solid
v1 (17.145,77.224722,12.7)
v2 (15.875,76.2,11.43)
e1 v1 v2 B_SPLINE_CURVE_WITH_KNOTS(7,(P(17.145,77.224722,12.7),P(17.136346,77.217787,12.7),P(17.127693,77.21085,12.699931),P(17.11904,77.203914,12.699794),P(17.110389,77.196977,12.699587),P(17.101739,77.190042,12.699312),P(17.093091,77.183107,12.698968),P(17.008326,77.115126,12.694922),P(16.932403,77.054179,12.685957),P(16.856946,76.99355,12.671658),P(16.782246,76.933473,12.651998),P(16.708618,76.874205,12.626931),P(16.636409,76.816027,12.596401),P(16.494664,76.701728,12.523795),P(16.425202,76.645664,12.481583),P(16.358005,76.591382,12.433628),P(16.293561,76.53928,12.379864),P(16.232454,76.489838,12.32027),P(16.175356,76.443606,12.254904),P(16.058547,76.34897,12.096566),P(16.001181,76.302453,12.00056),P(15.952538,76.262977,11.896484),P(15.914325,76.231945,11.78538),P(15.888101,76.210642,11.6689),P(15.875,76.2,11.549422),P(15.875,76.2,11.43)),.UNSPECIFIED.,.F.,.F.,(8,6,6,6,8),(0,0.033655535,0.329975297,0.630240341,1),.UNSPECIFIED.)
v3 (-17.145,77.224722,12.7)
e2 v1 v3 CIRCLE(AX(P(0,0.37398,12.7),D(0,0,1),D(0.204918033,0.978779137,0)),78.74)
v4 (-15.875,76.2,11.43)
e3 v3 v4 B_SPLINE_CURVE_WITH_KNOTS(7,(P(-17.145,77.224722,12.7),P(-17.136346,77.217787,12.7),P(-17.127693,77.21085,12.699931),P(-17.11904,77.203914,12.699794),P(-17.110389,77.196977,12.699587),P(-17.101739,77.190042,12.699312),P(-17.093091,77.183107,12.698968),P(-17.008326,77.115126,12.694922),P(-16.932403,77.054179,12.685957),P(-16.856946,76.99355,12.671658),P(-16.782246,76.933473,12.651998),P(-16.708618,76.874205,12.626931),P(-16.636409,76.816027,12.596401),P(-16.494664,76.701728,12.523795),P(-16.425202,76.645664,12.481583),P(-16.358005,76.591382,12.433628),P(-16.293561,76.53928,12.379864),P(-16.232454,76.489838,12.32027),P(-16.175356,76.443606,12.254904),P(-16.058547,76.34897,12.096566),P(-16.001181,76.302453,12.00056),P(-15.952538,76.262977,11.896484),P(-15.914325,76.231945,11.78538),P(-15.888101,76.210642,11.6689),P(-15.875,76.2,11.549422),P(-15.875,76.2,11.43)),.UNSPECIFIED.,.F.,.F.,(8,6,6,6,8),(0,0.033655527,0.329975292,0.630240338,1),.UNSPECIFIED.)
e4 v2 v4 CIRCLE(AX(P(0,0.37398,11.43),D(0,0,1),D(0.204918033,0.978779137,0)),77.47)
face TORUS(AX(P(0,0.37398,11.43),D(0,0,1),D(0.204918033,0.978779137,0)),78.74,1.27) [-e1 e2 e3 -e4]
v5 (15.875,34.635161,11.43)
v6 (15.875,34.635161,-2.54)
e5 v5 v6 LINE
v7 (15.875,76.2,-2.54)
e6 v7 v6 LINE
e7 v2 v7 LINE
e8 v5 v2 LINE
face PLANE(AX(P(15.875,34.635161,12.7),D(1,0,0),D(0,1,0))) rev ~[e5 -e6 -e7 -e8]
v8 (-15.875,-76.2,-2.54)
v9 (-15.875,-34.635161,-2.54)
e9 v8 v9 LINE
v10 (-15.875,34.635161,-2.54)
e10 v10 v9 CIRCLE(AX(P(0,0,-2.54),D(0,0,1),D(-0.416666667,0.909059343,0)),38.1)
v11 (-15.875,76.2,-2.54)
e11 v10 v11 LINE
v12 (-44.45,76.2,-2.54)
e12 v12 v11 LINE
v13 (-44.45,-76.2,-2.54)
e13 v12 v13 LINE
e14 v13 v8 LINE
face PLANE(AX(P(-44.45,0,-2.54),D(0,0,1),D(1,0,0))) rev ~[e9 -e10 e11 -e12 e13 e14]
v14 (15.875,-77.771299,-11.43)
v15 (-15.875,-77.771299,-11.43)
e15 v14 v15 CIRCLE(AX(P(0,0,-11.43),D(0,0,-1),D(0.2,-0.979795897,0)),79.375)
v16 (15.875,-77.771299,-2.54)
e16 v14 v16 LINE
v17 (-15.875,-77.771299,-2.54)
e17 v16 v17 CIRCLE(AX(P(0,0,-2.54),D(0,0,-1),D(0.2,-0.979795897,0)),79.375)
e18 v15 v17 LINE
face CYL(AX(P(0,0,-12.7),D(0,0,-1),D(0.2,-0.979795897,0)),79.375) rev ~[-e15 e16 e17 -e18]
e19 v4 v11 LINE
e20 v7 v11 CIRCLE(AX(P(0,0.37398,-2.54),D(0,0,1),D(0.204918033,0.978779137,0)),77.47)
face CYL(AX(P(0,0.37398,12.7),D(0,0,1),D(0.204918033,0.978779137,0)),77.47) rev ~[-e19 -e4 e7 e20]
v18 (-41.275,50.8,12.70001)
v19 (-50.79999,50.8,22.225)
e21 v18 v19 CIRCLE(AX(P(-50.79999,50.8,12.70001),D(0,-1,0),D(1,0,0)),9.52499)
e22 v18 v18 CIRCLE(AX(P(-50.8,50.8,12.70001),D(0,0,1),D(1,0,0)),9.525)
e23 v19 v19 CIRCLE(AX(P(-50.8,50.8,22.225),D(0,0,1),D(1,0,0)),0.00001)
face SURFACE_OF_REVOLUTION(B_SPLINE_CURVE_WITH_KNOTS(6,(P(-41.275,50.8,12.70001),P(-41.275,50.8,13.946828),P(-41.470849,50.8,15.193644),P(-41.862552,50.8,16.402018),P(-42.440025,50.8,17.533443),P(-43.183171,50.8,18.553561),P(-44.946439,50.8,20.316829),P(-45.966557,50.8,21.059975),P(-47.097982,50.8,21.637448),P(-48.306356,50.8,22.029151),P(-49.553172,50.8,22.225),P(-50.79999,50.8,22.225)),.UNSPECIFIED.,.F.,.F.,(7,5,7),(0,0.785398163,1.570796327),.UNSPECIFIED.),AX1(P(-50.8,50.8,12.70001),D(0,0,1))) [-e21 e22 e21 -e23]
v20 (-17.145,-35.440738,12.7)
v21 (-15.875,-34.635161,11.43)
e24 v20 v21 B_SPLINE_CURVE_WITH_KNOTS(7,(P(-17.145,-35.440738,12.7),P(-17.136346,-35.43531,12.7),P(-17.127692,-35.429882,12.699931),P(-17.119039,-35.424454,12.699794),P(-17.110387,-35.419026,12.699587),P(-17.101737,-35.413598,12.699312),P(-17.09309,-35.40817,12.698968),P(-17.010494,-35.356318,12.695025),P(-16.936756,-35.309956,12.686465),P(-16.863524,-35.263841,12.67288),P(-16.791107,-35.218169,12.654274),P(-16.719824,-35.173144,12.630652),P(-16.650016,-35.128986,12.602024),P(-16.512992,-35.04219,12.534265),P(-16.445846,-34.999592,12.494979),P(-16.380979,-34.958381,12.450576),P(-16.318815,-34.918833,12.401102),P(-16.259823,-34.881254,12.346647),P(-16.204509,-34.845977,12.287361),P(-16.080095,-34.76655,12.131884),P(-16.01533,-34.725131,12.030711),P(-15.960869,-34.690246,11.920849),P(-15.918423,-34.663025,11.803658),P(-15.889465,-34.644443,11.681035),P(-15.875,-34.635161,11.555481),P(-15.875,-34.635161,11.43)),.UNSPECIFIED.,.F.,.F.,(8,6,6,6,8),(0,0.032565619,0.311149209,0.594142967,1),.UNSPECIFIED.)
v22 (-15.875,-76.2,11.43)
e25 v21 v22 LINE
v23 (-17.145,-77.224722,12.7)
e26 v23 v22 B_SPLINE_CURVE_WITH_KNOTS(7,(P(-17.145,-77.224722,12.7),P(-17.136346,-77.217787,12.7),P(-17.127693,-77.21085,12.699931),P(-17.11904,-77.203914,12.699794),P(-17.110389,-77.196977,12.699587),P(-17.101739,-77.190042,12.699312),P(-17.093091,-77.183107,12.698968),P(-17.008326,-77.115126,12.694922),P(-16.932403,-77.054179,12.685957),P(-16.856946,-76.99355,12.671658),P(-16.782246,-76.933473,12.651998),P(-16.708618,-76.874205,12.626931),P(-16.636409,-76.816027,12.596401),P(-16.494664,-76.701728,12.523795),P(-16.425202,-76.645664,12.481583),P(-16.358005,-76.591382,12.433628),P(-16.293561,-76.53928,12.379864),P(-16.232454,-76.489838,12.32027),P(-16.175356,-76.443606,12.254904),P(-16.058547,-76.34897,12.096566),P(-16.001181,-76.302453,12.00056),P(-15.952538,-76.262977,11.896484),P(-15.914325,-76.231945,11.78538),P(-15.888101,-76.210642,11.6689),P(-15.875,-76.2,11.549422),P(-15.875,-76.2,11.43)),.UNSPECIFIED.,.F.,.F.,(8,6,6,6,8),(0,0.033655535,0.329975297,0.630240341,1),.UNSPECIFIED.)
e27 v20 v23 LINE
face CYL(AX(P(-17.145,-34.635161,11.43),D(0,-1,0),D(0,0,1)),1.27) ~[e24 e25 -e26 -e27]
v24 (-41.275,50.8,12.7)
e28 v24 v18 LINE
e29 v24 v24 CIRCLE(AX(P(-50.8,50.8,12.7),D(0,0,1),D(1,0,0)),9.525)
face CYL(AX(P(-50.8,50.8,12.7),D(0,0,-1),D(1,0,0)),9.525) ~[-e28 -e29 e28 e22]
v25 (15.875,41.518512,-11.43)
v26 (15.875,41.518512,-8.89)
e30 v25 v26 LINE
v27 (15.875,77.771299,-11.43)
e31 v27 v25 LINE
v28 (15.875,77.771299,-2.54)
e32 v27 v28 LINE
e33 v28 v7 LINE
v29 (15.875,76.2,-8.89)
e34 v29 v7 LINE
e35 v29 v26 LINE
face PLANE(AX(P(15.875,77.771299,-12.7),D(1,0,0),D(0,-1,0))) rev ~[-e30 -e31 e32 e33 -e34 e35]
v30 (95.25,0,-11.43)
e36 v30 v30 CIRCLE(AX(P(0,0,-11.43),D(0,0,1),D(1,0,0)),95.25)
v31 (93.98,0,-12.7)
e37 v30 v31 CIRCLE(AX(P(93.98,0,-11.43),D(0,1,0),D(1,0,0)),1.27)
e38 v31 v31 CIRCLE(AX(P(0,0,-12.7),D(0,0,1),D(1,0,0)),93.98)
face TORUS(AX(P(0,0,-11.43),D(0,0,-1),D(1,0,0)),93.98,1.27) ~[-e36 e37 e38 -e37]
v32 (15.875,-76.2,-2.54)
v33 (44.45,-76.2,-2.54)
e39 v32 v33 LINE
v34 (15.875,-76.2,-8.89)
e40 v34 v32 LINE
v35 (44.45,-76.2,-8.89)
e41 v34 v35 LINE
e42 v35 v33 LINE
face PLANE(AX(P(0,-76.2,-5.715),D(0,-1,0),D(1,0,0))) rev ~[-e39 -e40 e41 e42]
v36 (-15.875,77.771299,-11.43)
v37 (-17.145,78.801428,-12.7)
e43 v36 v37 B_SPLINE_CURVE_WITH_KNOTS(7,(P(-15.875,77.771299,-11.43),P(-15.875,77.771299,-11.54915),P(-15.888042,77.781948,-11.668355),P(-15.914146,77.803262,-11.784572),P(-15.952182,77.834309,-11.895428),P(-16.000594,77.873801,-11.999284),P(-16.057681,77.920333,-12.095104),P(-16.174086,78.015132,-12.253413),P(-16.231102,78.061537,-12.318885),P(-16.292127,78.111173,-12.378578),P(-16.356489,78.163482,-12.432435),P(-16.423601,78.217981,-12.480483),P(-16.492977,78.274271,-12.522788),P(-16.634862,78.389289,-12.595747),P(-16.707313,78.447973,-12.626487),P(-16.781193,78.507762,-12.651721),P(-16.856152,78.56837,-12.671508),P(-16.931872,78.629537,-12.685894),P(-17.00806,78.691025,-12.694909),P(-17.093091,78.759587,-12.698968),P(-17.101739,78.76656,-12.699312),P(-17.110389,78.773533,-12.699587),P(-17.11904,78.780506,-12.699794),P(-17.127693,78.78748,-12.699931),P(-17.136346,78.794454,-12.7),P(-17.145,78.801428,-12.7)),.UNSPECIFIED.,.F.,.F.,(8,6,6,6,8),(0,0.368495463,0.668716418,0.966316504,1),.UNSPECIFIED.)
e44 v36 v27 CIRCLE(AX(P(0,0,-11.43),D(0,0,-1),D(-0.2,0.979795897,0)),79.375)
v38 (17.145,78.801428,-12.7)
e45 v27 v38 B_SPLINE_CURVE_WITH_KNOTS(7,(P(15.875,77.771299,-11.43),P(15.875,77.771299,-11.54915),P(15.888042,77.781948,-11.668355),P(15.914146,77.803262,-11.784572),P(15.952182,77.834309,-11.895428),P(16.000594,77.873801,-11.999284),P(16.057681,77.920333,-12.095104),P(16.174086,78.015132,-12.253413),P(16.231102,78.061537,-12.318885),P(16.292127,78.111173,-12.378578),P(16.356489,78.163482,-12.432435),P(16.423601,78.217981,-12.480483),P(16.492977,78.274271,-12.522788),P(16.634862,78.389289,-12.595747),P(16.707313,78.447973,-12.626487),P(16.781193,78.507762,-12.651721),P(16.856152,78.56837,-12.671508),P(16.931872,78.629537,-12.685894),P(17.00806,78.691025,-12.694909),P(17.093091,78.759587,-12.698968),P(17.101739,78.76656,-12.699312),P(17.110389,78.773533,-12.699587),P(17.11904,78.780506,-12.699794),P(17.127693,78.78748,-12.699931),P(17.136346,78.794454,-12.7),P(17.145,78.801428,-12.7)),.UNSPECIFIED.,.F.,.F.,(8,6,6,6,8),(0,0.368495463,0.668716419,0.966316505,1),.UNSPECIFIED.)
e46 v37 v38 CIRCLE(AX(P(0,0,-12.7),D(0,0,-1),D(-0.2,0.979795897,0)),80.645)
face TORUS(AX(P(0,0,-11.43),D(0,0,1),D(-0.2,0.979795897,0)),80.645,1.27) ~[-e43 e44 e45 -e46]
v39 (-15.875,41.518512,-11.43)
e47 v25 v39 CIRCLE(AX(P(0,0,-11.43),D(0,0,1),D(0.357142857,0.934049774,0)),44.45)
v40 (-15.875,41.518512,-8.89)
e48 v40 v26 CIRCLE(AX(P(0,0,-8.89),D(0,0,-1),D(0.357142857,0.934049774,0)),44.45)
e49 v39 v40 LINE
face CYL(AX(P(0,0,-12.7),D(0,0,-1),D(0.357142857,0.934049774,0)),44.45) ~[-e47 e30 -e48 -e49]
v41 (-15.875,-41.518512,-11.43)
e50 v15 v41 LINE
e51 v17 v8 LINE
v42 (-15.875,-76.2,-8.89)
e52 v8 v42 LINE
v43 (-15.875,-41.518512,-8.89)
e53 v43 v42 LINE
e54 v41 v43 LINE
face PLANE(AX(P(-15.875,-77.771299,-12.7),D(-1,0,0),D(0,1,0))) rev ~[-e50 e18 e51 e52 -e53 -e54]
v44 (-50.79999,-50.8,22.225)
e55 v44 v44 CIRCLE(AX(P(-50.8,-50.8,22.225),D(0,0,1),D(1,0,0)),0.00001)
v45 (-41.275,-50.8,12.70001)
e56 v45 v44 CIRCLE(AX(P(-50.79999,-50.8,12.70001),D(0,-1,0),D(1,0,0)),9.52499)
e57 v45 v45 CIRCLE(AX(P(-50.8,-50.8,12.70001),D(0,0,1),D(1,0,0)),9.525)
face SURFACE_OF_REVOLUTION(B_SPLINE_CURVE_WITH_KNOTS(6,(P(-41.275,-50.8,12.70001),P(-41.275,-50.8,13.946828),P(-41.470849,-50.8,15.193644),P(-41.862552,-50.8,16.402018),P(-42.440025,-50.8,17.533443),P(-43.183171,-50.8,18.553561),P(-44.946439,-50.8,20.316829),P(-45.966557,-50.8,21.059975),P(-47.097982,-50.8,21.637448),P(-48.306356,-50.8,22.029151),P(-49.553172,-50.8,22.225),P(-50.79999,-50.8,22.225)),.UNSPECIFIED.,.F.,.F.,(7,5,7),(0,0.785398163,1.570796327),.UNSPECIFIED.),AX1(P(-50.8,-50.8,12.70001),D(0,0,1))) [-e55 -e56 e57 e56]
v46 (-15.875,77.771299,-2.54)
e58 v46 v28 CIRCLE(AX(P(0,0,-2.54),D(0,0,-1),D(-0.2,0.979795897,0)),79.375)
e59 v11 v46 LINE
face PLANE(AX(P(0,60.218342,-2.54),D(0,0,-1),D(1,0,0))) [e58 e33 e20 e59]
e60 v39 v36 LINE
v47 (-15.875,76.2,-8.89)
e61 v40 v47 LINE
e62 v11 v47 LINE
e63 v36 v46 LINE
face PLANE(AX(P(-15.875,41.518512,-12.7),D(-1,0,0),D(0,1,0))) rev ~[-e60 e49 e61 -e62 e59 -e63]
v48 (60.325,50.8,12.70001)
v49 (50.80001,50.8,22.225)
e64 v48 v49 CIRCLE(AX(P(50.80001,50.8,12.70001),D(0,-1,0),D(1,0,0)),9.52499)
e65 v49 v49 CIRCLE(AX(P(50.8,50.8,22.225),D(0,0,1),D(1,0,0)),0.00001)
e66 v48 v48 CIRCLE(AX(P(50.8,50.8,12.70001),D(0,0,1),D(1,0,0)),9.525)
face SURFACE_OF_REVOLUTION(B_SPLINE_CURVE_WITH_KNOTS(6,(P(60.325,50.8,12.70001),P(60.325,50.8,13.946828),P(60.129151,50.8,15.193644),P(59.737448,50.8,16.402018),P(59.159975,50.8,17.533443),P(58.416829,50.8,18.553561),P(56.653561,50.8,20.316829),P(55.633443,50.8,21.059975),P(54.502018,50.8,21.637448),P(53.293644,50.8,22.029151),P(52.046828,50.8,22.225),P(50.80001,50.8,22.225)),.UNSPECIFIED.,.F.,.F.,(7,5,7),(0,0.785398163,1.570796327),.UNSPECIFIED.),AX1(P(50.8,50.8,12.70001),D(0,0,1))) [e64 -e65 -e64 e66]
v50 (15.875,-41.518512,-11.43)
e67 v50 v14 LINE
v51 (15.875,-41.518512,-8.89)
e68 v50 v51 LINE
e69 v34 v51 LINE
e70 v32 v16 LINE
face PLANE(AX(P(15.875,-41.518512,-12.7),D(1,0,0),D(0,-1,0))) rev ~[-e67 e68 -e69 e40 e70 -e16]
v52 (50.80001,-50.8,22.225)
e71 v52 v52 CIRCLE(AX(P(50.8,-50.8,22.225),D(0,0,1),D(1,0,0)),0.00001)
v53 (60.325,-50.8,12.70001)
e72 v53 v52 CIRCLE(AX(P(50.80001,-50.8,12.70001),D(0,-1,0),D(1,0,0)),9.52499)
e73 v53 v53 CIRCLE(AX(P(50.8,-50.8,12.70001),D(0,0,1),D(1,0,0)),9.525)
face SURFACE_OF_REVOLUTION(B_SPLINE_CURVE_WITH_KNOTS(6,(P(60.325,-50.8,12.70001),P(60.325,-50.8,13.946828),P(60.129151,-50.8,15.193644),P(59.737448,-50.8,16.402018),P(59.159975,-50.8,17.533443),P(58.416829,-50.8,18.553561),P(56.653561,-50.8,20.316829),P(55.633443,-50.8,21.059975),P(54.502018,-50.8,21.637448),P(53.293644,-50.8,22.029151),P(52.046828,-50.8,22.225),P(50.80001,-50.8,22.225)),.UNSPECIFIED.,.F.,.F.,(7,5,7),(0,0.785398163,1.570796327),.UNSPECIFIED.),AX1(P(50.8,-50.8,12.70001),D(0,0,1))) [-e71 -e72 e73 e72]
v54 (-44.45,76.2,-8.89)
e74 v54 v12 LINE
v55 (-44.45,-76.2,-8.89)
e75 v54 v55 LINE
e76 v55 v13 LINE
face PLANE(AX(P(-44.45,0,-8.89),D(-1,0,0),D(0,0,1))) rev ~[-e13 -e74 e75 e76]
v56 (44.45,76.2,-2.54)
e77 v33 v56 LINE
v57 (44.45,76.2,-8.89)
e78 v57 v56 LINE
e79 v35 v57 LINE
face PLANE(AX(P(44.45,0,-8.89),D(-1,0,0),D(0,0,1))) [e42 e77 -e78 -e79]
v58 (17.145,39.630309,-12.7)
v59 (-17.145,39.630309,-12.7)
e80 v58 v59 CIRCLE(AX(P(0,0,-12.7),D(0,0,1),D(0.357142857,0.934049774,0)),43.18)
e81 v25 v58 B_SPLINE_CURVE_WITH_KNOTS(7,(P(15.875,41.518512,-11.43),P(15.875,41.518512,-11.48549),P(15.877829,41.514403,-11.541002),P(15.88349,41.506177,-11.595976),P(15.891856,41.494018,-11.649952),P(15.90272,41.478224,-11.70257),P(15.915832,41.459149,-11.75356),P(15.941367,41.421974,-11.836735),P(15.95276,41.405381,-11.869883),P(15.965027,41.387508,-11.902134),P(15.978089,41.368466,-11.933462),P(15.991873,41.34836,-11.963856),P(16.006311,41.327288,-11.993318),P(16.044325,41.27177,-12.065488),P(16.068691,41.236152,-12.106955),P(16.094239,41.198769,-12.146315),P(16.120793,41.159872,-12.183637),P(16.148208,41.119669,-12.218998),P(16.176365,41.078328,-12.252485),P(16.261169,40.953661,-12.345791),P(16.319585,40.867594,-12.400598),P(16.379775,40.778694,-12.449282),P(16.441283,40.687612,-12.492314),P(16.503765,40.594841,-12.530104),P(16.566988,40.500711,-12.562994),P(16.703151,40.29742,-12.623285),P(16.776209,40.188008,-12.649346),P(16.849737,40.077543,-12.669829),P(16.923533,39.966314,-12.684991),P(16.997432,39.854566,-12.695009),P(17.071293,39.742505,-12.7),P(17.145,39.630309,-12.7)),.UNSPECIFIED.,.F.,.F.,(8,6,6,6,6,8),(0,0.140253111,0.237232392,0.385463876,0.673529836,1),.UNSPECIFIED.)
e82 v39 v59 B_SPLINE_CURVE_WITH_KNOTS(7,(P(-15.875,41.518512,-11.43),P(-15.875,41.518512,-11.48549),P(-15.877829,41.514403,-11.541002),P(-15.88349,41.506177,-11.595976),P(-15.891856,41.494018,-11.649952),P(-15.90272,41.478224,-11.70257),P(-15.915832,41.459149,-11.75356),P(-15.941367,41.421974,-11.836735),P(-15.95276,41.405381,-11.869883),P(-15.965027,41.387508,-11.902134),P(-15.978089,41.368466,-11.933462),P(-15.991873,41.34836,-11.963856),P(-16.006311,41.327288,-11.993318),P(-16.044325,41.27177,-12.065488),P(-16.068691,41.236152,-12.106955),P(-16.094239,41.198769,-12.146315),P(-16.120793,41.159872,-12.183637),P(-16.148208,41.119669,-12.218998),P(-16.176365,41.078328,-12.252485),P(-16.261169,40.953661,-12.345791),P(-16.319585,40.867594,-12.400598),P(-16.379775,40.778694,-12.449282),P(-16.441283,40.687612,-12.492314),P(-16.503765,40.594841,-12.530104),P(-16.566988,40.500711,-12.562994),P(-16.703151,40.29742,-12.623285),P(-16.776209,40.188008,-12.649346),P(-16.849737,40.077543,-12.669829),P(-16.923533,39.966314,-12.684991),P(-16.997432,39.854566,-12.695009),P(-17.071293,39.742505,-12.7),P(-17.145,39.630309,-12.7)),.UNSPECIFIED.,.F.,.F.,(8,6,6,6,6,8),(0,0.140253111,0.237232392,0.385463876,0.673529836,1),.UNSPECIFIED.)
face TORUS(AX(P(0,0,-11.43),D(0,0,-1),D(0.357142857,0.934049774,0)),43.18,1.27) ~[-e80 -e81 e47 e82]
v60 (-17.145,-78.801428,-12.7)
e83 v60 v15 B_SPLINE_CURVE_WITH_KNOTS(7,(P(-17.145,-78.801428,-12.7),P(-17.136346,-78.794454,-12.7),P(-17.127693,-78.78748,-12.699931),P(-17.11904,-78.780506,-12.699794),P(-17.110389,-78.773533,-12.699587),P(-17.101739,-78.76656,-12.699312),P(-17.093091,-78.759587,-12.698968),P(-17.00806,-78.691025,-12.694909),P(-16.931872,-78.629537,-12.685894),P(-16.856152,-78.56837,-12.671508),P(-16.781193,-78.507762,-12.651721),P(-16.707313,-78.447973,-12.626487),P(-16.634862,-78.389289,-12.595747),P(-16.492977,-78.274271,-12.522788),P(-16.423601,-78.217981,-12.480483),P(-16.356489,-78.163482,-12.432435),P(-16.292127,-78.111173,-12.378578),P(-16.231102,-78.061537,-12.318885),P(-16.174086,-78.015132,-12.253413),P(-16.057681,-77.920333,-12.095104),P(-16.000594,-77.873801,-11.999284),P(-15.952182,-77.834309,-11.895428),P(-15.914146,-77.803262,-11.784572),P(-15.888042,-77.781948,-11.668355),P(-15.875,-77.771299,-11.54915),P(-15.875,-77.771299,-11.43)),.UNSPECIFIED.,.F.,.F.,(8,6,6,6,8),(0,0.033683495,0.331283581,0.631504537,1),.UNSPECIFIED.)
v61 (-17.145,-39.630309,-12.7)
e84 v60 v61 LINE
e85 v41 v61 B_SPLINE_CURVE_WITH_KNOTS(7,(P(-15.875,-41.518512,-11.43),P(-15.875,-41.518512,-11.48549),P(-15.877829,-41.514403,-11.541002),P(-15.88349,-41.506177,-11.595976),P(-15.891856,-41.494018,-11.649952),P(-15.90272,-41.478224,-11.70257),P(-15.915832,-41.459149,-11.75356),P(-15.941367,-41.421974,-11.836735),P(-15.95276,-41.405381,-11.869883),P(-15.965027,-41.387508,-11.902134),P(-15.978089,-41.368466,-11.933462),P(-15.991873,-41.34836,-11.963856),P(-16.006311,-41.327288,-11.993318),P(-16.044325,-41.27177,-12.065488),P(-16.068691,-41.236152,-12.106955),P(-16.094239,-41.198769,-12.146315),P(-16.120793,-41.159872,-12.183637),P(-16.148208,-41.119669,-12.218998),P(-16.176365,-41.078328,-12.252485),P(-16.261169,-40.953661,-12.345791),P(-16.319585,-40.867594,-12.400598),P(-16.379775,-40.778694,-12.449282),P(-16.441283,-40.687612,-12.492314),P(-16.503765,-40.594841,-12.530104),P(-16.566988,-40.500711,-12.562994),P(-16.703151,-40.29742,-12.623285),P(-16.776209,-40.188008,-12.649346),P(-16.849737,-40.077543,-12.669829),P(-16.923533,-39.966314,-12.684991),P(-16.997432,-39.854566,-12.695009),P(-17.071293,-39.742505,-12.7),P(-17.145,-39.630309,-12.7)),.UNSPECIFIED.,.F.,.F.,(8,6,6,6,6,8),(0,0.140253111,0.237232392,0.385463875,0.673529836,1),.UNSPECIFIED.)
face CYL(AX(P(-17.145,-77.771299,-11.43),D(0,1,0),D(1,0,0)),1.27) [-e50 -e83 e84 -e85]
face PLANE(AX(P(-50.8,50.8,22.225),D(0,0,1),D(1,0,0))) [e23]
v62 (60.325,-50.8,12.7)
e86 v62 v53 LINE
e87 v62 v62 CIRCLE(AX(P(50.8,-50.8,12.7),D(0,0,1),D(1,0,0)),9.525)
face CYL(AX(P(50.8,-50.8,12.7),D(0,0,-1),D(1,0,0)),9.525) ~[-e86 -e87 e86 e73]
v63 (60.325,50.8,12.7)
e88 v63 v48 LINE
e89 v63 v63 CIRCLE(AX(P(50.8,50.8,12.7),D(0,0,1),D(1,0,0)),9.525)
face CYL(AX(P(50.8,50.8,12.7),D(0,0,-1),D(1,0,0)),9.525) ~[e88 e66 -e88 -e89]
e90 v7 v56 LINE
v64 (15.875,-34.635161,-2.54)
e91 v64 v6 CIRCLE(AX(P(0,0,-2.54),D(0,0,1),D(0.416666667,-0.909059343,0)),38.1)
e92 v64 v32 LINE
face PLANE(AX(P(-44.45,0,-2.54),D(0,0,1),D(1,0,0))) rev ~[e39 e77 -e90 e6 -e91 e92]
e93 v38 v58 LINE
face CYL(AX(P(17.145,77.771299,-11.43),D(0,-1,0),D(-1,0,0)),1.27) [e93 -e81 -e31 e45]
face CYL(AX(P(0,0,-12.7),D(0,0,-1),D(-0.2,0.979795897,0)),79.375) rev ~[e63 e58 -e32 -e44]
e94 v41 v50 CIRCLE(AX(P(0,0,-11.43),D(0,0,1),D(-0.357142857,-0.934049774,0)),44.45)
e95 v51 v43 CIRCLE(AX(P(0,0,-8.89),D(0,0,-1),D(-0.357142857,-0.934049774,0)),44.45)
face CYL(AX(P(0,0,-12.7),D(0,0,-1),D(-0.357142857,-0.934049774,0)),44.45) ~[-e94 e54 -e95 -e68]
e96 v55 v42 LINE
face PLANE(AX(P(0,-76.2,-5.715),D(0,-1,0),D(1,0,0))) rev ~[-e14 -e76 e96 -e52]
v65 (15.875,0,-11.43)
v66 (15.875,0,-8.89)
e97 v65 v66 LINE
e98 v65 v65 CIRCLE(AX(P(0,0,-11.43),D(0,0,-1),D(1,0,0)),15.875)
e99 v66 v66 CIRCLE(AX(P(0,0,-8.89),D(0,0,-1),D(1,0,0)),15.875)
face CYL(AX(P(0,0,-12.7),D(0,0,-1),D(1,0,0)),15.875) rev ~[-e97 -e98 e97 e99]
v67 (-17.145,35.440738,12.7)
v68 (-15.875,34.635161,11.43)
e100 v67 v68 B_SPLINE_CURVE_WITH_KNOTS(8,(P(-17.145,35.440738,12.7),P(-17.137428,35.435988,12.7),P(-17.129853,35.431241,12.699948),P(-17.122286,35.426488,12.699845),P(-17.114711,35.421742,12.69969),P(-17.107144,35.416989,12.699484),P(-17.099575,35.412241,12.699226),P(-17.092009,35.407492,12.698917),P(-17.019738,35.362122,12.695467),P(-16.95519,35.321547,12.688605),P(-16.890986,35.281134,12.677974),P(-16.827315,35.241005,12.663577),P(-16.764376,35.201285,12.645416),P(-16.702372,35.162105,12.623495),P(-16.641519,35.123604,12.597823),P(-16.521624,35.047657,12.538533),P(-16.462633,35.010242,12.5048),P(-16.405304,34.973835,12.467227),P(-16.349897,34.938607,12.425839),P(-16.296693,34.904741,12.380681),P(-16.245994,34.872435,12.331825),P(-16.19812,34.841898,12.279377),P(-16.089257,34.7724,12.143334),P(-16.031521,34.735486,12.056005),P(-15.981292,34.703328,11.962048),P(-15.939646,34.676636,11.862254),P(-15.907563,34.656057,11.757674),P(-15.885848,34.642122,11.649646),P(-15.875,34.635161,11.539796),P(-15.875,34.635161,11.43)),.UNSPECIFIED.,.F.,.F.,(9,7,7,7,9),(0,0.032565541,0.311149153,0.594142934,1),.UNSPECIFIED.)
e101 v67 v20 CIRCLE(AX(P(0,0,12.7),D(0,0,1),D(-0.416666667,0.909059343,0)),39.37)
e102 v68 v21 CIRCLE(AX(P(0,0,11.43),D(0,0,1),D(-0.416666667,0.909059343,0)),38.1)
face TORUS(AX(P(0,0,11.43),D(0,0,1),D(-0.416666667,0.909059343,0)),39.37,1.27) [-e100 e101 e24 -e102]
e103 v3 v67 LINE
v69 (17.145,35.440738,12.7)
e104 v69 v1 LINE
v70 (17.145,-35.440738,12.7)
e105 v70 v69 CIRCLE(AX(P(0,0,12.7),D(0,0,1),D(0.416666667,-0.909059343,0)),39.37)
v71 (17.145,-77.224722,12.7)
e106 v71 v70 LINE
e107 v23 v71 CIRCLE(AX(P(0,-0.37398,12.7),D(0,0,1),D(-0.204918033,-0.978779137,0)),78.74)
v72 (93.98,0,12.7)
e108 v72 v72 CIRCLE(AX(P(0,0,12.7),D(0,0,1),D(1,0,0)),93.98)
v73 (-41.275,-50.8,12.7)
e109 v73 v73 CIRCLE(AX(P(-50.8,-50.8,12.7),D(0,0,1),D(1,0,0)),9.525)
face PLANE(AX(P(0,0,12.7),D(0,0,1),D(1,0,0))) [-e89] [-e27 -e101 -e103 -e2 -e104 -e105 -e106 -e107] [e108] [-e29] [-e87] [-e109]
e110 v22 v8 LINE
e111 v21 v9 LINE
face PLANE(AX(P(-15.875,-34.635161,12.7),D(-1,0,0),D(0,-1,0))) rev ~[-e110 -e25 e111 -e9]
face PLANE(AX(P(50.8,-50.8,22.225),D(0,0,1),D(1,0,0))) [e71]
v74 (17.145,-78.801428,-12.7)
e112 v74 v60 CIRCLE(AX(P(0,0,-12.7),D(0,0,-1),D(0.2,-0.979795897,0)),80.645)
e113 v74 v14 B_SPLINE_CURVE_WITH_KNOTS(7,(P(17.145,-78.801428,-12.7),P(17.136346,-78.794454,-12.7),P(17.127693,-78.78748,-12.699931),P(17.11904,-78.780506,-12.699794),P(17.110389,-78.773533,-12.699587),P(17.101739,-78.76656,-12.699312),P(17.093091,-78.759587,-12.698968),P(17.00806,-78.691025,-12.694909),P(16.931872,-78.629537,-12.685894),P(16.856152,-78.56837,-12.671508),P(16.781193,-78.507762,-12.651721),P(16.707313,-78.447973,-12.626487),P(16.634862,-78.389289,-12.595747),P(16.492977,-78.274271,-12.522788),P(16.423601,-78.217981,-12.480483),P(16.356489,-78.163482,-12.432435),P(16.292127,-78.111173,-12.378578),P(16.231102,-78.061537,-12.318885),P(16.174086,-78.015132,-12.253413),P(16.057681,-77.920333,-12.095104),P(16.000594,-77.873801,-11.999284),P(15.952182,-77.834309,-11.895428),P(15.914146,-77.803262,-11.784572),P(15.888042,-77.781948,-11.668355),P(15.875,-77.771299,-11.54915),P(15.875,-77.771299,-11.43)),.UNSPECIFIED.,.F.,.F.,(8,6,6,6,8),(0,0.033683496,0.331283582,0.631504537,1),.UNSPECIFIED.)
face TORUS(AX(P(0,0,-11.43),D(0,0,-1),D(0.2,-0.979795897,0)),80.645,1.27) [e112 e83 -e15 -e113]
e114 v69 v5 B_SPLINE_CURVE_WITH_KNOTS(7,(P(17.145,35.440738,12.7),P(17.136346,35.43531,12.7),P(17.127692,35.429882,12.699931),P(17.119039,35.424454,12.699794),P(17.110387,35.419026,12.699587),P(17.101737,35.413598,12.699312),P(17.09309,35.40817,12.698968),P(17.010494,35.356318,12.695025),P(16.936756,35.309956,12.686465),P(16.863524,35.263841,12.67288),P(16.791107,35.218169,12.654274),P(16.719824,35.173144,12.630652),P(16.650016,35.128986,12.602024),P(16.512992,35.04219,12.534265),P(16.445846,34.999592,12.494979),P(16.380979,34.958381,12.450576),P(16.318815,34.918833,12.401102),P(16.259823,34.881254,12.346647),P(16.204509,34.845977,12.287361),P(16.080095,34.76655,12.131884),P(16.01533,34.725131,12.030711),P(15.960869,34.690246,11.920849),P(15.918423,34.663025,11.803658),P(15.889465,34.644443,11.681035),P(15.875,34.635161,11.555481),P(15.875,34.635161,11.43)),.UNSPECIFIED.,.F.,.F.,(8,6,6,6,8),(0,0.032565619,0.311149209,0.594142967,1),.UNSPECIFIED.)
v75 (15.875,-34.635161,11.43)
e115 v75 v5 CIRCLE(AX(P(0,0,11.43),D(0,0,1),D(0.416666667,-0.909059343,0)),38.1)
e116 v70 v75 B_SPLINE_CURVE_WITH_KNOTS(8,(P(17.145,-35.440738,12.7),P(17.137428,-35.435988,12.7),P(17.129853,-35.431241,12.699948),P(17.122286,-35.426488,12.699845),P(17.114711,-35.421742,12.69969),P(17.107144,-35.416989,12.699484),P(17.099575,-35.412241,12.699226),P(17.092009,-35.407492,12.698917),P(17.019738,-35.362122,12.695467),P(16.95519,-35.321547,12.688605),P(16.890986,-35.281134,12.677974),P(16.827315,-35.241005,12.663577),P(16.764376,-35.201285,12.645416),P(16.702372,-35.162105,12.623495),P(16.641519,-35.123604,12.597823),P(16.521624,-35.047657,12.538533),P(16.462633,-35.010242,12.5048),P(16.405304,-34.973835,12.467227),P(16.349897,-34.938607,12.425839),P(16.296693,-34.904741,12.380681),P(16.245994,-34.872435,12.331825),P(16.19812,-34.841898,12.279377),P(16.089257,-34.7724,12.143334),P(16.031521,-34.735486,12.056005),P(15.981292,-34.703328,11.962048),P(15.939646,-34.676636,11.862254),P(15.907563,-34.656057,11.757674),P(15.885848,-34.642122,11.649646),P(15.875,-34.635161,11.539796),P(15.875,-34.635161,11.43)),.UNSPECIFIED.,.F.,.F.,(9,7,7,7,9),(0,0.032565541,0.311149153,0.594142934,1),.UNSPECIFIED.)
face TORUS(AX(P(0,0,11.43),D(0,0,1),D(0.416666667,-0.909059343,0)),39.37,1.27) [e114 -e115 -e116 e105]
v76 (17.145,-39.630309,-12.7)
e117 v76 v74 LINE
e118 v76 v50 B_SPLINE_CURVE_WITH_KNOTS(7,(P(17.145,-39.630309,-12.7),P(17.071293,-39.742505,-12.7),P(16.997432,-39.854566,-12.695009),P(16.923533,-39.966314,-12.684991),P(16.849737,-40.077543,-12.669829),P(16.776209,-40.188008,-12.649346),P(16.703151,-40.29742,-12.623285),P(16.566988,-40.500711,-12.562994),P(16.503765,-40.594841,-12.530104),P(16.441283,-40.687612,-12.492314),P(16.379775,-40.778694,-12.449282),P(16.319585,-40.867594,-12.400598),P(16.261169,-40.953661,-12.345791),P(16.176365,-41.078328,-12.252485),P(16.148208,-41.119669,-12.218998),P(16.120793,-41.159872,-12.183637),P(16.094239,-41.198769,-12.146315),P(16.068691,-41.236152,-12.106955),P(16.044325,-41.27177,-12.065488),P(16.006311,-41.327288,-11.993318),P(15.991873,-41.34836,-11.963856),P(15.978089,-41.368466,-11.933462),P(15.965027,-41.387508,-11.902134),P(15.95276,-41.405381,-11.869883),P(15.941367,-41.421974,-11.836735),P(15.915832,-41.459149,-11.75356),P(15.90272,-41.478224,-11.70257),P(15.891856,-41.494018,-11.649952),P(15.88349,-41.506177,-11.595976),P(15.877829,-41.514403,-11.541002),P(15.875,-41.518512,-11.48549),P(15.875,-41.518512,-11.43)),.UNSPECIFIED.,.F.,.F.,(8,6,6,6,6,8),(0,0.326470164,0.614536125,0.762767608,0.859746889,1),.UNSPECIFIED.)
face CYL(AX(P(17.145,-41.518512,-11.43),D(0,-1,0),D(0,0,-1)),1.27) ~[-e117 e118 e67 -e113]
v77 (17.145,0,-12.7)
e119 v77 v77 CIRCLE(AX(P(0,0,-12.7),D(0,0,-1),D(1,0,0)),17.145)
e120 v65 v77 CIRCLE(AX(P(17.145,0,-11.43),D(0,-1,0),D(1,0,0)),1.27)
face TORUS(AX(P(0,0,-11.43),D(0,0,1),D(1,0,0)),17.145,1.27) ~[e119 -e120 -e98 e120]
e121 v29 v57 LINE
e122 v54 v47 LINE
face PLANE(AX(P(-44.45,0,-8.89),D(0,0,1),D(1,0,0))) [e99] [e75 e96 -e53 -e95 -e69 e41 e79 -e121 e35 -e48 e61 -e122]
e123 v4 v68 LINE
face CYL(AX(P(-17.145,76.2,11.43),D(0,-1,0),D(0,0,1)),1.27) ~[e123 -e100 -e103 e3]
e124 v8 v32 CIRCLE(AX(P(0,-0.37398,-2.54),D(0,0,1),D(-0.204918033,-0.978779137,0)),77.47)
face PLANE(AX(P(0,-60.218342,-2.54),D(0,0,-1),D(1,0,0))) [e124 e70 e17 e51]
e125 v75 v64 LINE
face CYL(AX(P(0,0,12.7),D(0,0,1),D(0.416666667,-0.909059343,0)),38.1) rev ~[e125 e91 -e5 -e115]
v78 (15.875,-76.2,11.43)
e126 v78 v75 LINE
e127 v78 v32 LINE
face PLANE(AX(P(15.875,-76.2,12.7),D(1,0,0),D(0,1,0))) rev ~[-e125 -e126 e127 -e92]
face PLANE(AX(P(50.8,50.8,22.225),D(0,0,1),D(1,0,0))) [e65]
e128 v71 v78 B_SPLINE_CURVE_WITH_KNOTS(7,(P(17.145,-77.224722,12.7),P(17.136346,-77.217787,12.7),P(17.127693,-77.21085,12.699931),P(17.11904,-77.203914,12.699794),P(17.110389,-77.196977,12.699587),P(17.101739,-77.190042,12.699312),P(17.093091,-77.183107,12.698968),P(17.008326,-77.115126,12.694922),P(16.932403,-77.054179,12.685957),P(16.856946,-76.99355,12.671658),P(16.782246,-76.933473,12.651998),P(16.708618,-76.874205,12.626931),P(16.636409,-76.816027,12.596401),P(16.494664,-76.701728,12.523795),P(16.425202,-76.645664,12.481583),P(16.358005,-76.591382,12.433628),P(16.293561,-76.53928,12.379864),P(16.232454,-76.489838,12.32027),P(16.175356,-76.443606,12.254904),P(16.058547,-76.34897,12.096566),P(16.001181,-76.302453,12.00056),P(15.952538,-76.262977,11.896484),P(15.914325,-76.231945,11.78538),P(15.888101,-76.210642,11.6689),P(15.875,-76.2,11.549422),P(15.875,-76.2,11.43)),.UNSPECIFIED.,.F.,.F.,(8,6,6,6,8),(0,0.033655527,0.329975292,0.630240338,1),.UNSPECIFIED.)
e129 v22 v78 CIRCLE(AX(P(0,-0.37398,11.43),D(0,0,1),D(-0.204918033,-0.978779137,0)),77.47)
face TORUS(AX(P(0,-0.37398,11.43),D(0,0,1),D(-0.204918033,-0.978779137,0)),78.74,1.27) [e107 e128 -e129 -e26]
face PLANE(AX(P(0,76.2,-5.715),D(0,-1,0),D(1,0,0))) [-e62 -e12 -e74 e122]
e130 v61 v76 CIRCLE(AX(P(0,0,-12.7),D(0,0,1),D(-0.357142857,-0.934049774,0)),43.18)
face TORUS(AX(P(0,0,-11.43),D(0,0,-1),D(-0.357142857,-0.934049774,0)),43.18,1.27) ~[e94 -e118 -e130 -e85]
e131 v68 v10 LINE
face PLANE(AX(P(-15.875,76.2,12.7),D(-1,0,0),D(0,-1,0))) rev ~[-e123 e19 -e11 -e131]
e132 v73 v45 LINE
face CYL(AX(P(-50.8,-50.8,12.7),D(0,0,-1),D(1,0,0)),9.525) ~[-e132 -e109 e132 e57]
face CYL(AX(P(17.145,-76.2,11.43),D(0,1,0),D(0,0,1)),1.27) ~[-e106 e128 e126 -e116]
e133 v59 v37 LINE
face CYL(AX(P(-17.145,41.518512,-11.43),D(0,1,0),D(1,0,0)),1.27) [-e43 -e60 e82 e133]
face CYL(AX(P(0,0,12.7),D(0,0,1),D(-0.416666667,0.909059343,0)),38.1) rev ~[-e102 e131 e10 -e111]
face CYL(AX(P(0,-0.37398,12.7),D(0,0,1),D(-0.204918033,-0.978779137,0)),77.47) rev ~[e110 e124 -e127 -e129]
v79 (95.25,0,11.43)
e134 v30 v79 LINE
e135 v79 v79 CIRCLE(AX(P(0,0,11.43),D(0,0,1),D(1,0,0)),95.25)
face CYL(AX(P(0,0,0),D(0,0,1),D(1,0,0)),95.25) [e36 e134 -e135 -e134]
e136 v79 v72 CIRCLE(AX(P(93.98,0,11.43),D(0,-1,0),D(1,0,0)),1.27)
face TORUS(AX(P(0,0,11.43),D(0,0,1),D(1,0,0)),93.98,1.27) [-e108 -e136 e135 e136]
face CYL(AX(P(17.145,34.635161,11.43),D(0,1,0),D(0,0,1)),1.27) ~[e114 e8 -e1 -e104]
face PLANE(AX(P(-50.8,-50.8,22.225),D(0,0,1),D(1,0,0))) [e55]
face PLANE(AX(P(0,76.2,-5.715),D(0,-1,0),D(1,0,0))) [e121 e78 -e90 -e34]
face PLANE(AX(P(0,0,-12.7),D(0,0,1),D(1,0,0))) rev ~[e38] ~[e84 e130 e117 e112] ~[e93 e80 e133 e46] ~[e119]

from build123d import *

# Parameters (mm, degrees)
F0_R          = 95.25
F1_DEPTH      = 12.7
F1_DEPTH_BACK = 12.7
F3_DEPTH      = 15.24
F4_R          = 1.27
F5_W          = 88.9
F5_H          = 6.35
F6_DEPTH      = 76.2
F6_DEPTH_BACK = 76.2
F7_R          = 9.525
F8_DEPTH      = 9.525
F9_R          = 9.52499
F10_R         = 15.875
F11_DEPTH     = 10.16
F12_R         = 1.27


# Not quite as in the source:
# - a fillet or chamfer is up to 0.001 mm smaller than in the source, because OpenCascade refuses the exact size


with BuildPart() as f1:
    # F0 (on Top) → F1 (new body, two sides)
    with BuildSketch(Plane.XY) as f1_sk:
        Circle(F0_R)
    extrude(amount=-F1_DEPTH)
    extrude(f1_sk.sketch, amount=F1_DEPTH_BACK)

    # F2 (on face) → F3 (cut)
    with BuildSketch(Plane.XY.offset(12.7)):
        with BuildLine():
            Line((-15.875, -34.635160964), (-15.875, 34.635160964))
            ThreePointArc((-15.875, 34.635160964), (-38.1, 0), (-15.875, -34.635160964))
        make_face()
        Polygon((-15.875, 76.2), (-15.875, 34.635160964), (-15.875, -34.635160964), (-15.875, -76.2), (15.875, -76.2), (15.875, -34.635160964), (15.875, 34.635160964), (15.875, 76.2), align=None)
        with BuildLine():
            ThreePointArc((15.875, 76.2), (0, 77.8439802245), (-15.875, 76.2))
            Line((-15.875, 76.2), (15.875, 76.2))
        make_face()
        with BuildLine():
            Line((15.875, -76.2), (-15.875, -76.2))
            ThreePointArc((-15.875, -76.2), (0, -77.8439802245), (15.875, -76.2))
        make_face()
        with BuildLine():
            ThreePointArc((15.875, -34.635160964), (38.1, 0), (15.875, 34.635160964))
            Line((15.875, 34.635160964), (15.875, -34.635160964))
        make_face()
    extrude(amount=-F3_DEPTH, mode=Mode.SUBTRACT)

    # F4
    f4_edges = [f1.edges().sort_by_distance(p)[0] for p in [
        (-95.25, 0, 12.7),
        (-38.1, 0, 12.7),
        (-15.875, -55.41758, 12.7),
        (0, -77.84398, 12.7),
        (15.875, -55.41758, 12.7),
        (38.1, 0, 12.7),
        (15.875, 55.41758, 12.7),
        (0, 77.84398, 12.7),
        (-15.875, 55.41758, 12.7),
        (-95.25, 0, -12.7),
    ]]
    fillet(f4_edges, radius=F4_R)

    # F5 (on Front) → F6 (cut, two sides)
    with BuildSketch(Plane.XZ) as f6_sk:
        with Locations((0, -5.715)):
            Rectangle(F5_W, F5_H)
    extrude(amount=-F6_DEPTH, mode=Mode.SUBTRACT)
    extrude(f6_sk.sketch, amount=F6_DEPTH_BACK, mode=Mode.SUBTRACT)

    # F7 (on face) → F8 (join)
    with BuildSketch(Plane.XY.offset(12.7)):
        with Locations((-50.8, 50.8)):
            Circle(F7_R)
        with Locations((50.8, 50.8)):
            Circle(F7_R)
        with Locations((50.8, -50.8)):
            Circle(F7_R)
        with Locations((-50.8, -50.8)):
            Circle(F7_R)
    extrude(amount=F8_DEPTH)

    # F9 (radius 9.525 in the source; OpenCascade refuses exactly that, so slightly less here)
    f9_edges = [f1.edges().sort_by_distance(p)[0] for p in [
        (-60.325, 50.8, 22.225),
        (41.275, 50.8, 22.225),
        (41.275, -50.8, 22.225),
        (-60.325, -50.8, 22.225),
    ]]
    fillet(f9_edges, radius=F9_R)

    # F10 (on face) → F11 (cut)
    with BuildSketch(Plane(origin=(0, 0, -12.7), x_dir=(1, 0, 0), z_dir=(0, 0, -1))):
        with BuildLine():
            ThreePointArc((-15.875, -77.7712993334), (0, -79.375), (15.875, -77.7712993334))
            Line((15.875, -77.7712993334), (15.875, -41.5185124372))
            ThreePointArc((15.875, -41.5185124372), (0, -44.45), (-15.875, -41.5185124372))
            Line((-15.875, -41.5185124372), (-15.875, -77.7712993334))
        make_face()
        Circle(F10_R)
        with BuildLine():
            Line((-15.875, 77.7712993334), (-15.875, 41.5185124372))
            ThreePointArc((-15.875, 41.5185124372), (0, 44.45), (15.875, 41.5185124372))
            Line((15.875, 41.5185124372), (15.875, 77.7712993334))
            ThreePointArc((15.875, 77.7712993334), (0, 79.375), (-15.875, 77.7712993334))
        make_face()
    extrude(amount=-F11_DEPTH, mode=Mode.SUBTRACT)

    # F12
    f12_edges = [f1.edges().sort_by_distance(p)[0] for p in [
        (-93.98, 0, -12.7),
        (0, -79.375, -12.7),
        (15.875, -59.644906, -12.7),
        (0, -44.45, -12.7),
        (-15.875, -59.644906, -12.7),
        (-15.875, 0, -12.7),
        (15.875, 59.644906, -12.7),
        (0, 79.375, -12.7),
        (-15.875, 59.644906, -12.7),
        (0, 44.45, -12.7),
    ]]
    fillet(f12_edges, radius=F12_R)


solid = f1.part
